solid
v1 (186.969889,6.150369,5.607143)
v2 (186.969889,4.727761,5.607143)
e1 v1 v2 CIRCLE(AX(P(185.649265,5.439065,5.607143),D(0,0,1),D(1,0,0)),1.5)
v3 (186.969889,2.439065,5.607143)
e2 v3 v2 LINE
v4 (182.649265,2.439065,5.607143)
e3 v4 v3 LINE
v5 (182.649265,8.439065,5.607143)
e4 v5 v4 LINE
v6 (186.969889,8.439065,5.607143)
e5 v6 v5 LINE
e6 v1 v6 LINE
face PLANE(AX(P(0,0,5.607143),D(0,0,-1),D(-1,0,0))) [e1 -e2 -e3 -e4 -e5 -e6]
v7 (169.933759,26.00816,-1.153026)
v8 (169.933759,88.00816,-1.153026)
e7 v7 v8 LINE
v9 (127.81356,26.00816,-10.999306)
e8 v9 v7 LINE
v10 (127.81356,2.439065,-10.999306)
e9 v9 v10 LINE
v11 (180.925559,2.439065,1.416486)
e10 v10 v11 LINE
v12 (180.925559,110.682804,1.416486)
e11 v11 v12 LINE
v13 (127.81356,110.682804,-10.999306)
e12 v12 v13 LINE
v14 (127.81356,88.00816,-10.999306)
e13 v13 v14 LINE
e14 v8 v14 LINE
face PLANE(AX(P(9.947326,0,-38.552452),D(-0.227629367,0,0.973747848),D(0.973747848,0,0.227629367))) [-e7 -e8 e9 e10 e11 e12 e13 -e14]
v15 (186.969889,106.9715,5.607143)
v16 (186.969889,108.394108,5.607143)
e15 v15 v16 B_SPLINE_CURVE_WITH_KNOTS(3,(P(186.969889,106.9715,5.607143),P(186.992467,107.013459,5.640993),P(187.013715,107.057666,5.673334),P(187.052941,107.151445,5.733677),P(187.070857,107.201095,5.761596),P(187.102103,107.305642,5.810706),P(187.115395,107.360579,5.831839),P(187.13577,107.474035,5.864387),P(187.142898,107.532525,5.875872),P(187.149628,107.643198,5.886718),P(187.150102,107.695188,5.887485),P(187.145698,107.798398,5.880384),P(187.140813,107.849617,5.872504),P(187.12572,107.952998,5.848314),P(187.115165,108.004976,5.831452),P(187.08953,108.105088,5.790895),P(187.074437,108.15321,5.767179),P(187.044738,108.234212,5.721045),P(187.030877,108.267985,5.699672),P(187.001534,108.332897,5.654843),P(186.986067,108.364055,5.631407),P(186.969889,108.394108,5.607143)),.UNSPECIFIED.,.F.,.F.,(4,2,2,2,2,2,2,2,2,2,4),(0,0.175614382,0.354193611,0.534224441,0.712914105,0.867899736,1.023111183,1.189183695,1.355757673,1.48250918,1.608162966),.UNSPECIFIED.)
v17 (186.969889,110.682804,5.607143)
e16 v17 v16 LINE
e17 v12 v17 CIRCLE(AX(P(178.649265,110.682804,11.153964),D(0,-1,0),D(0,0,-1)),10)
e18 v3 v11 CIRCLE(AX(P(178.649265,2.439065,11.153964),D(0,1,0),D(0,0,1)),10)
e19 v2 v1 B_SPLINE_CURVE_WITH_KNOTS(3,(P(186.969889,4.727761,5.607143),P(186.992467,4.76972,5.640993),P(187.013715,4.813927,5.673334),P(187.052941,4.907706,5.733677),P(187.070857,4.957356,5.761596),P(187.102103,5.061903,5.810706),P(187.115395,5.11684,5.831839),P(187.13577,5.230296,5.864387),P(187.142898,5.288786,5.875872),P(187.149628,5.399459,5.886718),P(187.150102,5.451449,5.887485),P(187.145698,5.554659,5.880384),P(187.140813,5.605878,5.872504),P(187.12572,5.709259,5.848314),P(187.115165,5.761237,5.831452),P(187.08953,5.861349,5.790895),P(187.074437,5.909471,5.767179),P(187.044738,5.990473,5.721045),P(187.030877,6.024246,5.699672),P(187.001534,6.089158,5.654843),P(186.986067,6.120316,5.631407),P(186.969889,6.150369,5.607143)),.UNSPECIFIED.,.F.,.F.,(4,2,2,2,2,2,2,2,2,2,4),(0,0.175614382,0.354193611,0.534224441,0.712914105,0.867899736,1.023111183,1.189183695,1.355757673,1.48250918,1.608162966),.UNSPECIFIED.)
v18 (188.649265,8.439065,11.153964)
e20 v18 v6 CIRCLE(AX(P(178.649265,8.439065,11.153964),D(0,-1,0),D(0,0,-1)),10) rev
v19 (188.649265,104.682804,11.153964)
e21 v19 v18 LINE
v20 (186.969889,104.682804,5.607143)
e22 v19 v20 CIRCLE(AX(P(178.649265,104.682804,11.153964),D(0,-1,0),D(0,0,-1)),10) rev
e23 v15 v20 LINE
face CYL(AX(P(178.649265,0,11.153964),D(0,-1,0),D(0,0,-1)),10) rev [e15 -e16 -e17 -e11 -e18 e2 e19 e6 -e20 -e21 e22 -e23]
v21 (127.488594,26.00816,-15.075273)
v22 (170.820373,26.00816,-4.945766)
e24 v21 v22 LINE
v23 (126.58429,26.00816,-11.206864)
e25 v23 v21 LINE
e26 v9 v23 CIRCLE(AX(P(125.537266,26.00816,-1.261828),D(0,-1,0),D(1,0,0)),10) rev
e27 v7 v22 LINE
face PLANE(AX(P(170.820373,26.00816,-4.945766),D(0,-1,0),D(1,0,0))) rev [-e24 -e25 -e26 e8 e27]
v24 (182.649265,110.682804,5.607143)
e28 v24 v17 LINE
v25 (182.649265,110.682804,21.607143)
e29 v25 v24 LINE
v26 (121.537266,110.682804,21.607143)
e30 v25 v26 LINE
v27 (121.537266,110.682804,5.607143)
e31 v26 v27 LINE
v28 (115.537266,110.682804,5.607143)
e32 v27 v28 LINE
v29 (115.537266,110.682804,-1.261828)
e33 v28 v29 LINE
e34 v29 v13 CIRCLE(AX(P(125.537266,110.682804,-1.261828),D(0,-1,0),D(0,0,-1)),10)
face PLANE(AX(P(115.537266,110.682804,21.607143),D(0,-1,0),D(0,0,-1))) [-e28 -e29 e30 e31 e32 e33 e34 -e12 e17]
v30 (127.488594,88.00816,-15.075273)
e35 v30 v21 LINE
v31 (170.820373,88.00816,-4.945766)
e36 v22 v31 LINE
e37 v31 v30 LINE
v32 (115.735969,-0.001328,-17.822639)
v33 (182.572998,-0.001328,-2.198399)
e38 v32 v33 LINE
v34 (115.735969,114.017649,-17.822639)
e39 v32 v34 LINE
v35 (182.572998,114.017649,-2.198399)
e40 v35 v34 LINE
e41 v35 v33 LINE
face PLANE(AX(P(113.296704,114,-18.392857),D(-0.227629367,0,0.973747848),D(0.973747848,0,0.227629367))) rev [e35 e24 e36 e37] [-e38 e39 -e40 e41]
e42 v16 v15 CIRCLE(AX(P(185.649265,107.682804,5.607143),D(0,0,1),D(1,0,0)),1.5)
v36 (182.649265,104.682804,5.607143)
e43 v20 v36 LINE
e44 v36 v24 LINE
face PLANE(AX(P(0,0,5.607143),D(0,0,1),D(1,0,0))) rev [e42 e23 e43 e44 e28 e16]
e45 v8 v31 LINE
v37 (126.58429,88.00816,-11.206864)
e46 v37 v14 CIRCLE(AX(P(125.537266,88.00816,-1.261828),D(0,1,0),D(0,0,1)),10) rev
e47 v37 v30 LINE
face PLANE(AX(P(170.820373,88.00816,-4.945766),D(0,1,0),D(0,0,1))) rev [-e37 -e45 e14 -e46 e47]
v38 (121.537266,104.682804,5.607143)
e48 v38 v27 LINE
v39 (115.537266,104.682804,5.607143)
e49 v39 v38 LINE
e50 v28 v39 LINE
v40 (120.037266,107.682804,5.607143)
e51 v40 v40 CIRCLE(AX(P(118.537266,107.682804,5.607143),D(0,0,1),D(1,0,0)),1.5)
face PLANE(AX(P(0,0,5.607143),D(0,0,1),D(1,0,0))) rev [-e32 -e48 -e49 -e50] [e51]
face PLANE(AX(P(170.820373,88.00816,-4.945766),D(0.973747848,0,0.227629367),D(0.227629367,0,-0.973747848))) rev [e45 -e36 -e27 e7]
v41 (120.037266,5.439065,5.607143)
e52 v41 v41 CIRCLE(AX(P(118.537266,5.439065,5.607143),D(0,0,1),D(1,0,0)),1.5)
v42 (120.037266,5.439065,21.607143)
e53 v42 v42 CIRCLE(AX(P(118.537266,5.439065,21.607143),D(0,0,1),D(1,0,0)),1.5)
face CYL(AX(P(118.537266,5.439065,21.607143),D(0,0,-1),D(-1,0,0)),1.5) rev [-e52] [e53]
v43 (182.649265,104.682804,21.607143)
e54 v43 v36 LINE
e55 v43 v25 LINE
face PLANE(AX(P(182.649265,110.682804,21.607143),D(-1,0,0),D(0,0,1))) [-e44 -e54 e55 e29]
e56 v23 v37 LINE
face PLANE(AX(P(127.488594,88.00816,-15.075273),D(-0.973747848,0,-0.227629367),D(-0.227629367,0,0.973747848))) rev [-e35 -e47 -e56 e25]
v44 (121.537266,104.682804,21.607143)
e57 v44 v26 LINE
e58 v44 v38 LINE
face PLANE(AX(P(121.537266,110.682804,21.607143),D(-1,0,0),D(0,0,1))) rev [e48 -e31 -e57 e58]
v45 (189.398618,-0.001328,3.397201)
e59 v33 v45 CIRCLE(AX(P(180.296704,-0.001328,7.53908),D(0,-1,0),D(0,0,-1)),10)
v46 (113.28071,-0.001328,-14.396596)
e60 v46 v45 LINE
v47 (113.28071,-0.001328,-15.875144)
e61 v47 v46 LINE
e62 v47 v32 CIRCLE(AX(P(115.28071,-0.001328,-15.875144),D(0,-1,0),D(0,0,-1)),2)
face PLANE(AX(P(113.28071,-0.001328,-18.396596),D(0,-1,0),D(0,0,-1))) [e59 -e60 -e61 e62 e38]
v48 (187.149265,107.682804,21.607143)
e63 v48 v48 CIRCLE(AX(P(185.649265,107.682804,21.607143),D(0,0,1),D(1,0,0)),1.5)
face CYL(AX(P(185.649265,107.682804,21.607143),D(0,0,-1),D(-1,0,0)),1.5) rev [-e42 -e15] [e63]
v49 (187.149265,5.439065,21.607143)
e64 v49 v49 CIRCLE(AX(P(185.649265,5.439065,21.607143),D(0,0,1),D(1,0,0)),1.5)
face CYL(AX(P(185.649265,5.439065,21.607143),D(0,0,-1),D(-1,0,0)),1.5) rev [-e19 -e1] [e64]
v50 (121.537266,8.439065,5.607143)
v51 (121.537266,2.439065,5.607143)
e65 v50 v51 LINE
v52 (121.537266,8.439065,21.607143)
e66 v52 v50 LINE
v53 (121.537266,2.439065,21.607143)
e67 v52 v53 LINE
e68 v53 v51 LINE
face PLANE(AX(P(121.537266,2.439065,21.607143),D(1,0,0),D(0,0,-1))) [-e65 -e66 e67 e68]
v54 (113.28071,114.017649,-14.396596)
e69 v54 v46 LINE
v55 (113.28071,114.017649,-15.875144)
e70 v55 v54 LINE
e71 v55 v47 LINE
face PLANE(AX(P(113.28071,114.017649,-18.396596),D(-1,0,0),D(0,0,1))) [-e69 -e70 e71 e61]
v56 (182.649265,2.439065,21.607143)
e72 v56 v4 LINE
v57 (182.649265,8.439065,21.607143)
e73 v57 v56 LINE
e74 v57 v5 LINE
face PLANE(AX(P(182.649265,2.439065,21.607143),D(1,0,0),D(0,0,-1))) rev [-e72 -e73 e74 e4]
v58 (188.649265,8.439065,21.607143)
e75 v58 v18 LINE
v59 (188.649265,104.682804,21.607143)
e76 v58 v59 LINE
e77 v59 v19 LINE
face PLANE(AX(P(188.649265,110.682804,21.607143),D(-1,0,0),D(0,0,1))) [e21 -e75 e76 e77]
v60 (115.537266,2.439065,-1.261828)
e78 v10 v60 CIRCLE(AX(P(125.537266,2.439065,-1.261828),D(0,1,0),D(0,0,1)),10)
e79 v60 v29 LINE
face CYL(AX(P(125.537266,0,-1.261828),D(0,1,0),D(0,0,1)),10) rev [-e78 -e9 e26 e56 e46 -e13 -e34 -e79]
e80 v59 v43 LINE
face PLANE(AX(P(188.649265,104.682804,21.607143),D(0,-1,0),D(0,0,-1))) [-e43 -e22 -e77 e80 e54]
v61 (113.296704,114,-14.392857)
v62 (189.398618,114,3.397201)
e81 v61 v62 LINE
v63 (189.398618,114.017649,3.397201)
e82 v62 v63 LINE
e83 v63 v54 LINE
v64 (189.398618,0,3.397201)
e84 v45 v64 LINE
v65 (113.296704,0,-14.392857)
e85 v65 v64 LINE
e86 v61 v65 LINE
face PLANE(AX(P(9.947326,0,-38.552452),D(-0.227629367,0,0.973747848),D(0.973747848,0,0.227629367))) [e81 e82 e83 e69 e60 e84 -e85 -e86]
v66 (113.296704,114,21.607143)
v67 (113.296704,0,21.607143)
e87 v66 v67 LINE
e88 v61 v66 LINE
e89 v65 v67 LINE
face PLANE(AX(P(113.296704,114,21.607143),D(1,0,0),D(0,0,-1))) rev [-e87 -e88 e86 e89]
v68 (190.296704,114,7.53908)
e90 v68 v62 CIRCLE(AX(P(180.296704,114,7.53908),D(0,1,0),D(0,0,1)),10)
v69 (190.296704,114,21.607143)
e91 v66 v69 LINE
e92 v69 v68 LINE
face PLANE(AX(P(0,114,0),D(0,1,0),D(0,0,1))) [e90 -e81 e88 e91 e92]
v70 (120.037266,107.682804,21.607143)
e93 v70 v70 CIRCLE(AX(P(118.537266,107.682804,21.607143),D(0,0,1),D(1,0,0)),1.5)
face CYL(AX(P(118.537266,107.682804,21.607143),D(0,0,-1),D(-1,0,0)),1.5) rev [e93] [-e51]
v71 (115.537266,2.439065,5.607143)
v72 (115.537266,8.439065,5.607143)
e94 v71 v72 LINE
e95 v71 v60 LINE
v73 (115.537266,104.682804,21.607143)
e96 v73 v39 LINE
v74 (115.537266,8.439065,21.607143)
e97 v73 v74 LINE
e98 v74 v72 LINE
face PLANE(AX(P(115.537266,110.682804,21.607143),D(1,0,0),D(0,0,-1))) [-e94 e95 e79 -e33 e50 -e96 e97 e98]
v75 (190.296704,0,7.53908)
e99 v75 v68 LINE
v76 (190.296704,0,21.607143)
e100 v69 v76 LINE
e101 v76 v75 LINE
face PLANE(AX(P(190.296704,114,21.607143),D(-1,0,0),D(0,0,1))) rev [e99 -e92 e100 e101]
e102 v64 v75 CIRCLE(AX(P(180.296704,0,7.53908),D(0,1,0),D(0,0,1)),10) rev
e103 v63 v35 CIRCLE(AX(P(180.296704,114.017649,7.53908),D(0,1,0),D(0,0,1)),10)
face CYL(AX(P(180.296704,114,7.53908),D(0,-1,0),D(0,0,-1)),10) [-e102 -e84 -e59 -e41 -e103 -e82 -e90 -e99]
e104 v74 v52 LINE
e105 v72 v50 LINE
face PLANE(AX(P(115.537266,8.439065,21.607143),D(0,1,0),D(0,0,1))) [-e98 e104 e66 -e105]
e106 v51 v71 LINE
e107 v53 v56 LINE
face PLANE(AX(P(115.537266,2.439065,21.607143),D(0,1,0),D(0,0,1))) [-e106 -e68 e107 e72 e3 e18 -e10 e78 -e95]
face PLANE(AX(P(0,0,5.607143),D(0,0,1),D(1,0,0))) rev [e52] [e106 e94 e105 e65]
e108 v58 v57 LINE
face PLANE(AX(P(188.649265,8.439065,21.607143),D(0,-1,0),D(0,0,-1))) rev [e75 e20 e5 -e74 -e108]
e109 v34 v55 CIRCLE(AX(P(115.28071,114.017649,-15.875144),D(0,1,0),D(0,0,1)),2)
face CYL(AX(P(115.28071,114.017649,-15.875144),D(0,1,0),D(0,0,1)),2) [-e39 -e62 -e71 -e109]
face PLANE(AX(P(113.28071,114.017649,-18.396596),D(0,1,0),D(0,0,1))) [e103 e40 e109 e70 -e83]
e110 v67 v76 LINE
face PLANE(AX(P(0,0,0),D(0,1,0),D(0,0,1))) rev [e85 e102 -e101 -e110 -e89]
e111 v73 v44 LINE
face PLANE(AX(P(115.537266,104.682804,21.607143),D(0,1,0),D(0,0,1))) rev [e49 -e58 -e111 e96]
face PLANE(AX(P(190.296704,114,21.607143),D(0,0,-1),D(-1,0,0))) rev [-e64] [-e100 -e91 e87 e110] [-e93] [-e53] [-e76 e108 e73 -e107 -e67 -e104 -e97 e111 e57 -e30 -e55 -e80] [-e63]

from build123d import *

# Parameters (mm, degrees)
RESSALTO_EXTRUS_O1_DEPTH   = 114
CORTE_EXTRUS_O1_DEPTH      = 59
RESSALTO_EXTRUS_O3_DEPTH   = 4
FILETE1_R                  = 10
FILETE2_R                  = 10
FILETE3_R                  = 10
FILETE4_R                  = 2
CORTE_EXTRUS_O2_DEPTH      = 19
CORTE_EXTRUS_O2_DEPTH_BACK = 10
F_3DSKETCH5_R              = 1.5
RESSALTO_EXTRUS_O6_DEPTH   = 16


with BuildPart() as part:
    # Esboço1 → Ressalto-extrusão1 (new body)
    with BuildSketch(Plane(origin=(0, 0, 0), x_dir=(1, 0, 0), z_dir=(0, 1, 0))):
        Polygon((113.296704203, 18.392857143), (190.296704203, 0.392857143), (190.296704203, -21.607142857), (113.296704203, -21.607142857), align=None)
    extrude(amount=RESSALTO_EXTRUS_O1_DEPTH)

    # 3DSketch1 → Corte-extrusão1 (cut)
    with BuildSketch(Plane(origin=(115.537266243, 110.682804253, 21.607142857), x_dir=(0.5597225204223067, -0.8286800951706879, 0), z_dir=(0, 0, -1))):
        Polygon((0, 0), (40.922432447, -60.586458429), (130.621864407, 0), (89.699431959, 60.586458429), align=None)
    extrude(amount=CORTE_EXTRUS_O1_DEPTH, mode=Mode.SUBTRACT)

    # 3DSketch3 → Ressalto-extrusão3 (add, along a direction that is not the sketch's normal)
    with BuildSketch(Plane(origin=(113.280710176, 114.017648872, -18.396596006), x_dir=(0.5549294721149596, -0.8217207699541985, 0.12972377270219831), z_dir=(-0.22762936703818706, 0, 0.9737478478855778))):
        Polygon((0, 0), (45.064591164, 64.978311237), (138.756352747, 0), (93.691761582, -64.978311237), align=None)
    extrude(amount=RESSALTO_EXTRUS_O3_DEPTH, dir=(0, 0, 1))

    # Filete1
    # the kernel refuses this fillet: 10 mm, written as the material it takes off along each edge
    with BuildSketch(Plane(origin=(190.296704203, -19.829841849, -0.392857143), x_dir=(-0.973747847885578, 0, -0.22762936703818593), z_dir=(0, 1, 0))) as filete1_piece_1:
        with BuildLine():
            CenterArc((FILETE1_R * 0.793193673946, FILETE1_R), FILETE1_R, 193.15754274, 76.84245726)
            Line((-FILETE1_R * 0.180554173939, FILETE1_R * 0.772370632962), (0, 0))
            Line((0, 0), (FILETE1_R * 0.793193673946, 0))
        make_face()
    extrude(amount=153.659683697, mode=Mode.SUBTRACT)

    # Filete2
    filete2_edges = [part.edges().sort_by_distance(p)[0] for p in [
        (188.649265411, 56.560934739, 3.222027295),
    ]]
    fillet(filete2_edges, radius=FILETE2_R)

    # Filete3
    filete3_edges = [part.edges().sort_by_distance(p)[0] for p in [
        (115.537266243, 56.560934739, -13.869089393),
    ]]
    fillet(filete3_edges, radius=FILETE3_R)

    # Filete4
    filete4_edges = [part.edges().sort_by_distance(p)[0] for p in [
        (113.280710176, 57.008160365, -18.396596006),
    ]]
    fillet(filete4_edges, radius=FILETE4_R)

    # 3DSketch4 → Corte-extrusão2 (cut, two sides: drawn at the far end of the back side and taken through both)
    with BuildSketch(Plane(origin=(170.820373008, 88.008160365, -4.945765734), x_dir=(-0.5677884026874886, -0.8124033121057346, -0.13272975647240007), z_dir=(0.22762936703818715, 0, -0.9737478478855778)).offset(-CORTE_EXTRUS_O2_DEPTH_BACK)):
        Polygon((0, 0), (25.94776869, 36.151947389), (76.316774041, 0), (50.369005351, -36.151947389), align=None)
    extrude(amount=CORTE_EXTRUS_O2_DEPTH + CORTE_EXTRUS_O2_DEPTH_BACK, mode=Mode.SUBTRACT)

    # 3DSketch5 → Ressalto-extrusão6 (add)
    # profile 1 of 4: a face of its own
    with BuildSketch(Plane(origin=(115.537266243, 110.682804253, 21.607142857), x_dir=(0.5597225204223067, -0.8286800951706879, 0), z_dir=(0, 0, -1))):
        Polygon((0, 0), (3.358335123, -4.972080571), (8.330415694, -1.613745448), (4.972080571, 3.358335123), align=None)
        with Locations(Location((4.165207847, -0.806872724, 0), (0, 0, 304.036610354))):
            Circle(F_3DSKETCH5_R, mode=Mode.SUBTRACT)
    # profile 2 of 4: a face of its own
    with BuildSketch(Plane(origin=(115.537266243, 110.682804253, 21.607142857), x_dir=(0.5597225204223067, -0.8286800951706879, 0), z_dir=(0, 0, -1))):
        Polygon((40.922432447, -60.586458429), (37.564097325, -55.614377858), (42.536177896, -52.256042735), (45.894513018, -57.228123306), align=None)
        with Locations(Location((41.729305172, -56.421250582, 0), (0, 0, 275.729153182))):
            Circle(F_3DSKETCH5_R, mode=Mode.SUBTRACT)
    # profile 3 of 4: a face of its own
    with BuildSketch(Plane(origin=(115.537266243, 110.682804253, 21.607142857), x_dir=(0.5597225204223067, -0.8286800951706879, 0), z_dir=(0, 0, -1))):
        Polygon((130.621864407, 0), (127.263529284, 4.972080571), (122.291448713, 1.613745448), (125.649783836, -3.358335123), align=None)
        with Locations(Location((126.45665656, 0.806872724, 0), (0, 0, 332.344067525))):
            Circle(F_3DSKETCH5_R, mode=Mode.SUBTRACT)
    # profile 4 of 4: a face of its own
    with BuildSketch(Plane(origin=(115.537266243, 110.682804253, 21.607142857), x_dir=(0.5597225204223067, -0.8286800951706879, 0), z_dir=(0, 0, -1))):
        Polygon((89.699431959, 60.586458429), (93.057767082, 55.614377858), (88.085686511, 52.256042735), (84.727351388, 57.228123306), align=None)
        with Locations(Location((88.892559235, 56.421250582, 0), (0, 0, 304.036610354))):
            Circle(F_3DSKETCH5_R, mode=Mode.SUBTRACT)
    extrude(amount=RESSALTO_EXTRUS_O6_DEPTH)


solid = part.part
